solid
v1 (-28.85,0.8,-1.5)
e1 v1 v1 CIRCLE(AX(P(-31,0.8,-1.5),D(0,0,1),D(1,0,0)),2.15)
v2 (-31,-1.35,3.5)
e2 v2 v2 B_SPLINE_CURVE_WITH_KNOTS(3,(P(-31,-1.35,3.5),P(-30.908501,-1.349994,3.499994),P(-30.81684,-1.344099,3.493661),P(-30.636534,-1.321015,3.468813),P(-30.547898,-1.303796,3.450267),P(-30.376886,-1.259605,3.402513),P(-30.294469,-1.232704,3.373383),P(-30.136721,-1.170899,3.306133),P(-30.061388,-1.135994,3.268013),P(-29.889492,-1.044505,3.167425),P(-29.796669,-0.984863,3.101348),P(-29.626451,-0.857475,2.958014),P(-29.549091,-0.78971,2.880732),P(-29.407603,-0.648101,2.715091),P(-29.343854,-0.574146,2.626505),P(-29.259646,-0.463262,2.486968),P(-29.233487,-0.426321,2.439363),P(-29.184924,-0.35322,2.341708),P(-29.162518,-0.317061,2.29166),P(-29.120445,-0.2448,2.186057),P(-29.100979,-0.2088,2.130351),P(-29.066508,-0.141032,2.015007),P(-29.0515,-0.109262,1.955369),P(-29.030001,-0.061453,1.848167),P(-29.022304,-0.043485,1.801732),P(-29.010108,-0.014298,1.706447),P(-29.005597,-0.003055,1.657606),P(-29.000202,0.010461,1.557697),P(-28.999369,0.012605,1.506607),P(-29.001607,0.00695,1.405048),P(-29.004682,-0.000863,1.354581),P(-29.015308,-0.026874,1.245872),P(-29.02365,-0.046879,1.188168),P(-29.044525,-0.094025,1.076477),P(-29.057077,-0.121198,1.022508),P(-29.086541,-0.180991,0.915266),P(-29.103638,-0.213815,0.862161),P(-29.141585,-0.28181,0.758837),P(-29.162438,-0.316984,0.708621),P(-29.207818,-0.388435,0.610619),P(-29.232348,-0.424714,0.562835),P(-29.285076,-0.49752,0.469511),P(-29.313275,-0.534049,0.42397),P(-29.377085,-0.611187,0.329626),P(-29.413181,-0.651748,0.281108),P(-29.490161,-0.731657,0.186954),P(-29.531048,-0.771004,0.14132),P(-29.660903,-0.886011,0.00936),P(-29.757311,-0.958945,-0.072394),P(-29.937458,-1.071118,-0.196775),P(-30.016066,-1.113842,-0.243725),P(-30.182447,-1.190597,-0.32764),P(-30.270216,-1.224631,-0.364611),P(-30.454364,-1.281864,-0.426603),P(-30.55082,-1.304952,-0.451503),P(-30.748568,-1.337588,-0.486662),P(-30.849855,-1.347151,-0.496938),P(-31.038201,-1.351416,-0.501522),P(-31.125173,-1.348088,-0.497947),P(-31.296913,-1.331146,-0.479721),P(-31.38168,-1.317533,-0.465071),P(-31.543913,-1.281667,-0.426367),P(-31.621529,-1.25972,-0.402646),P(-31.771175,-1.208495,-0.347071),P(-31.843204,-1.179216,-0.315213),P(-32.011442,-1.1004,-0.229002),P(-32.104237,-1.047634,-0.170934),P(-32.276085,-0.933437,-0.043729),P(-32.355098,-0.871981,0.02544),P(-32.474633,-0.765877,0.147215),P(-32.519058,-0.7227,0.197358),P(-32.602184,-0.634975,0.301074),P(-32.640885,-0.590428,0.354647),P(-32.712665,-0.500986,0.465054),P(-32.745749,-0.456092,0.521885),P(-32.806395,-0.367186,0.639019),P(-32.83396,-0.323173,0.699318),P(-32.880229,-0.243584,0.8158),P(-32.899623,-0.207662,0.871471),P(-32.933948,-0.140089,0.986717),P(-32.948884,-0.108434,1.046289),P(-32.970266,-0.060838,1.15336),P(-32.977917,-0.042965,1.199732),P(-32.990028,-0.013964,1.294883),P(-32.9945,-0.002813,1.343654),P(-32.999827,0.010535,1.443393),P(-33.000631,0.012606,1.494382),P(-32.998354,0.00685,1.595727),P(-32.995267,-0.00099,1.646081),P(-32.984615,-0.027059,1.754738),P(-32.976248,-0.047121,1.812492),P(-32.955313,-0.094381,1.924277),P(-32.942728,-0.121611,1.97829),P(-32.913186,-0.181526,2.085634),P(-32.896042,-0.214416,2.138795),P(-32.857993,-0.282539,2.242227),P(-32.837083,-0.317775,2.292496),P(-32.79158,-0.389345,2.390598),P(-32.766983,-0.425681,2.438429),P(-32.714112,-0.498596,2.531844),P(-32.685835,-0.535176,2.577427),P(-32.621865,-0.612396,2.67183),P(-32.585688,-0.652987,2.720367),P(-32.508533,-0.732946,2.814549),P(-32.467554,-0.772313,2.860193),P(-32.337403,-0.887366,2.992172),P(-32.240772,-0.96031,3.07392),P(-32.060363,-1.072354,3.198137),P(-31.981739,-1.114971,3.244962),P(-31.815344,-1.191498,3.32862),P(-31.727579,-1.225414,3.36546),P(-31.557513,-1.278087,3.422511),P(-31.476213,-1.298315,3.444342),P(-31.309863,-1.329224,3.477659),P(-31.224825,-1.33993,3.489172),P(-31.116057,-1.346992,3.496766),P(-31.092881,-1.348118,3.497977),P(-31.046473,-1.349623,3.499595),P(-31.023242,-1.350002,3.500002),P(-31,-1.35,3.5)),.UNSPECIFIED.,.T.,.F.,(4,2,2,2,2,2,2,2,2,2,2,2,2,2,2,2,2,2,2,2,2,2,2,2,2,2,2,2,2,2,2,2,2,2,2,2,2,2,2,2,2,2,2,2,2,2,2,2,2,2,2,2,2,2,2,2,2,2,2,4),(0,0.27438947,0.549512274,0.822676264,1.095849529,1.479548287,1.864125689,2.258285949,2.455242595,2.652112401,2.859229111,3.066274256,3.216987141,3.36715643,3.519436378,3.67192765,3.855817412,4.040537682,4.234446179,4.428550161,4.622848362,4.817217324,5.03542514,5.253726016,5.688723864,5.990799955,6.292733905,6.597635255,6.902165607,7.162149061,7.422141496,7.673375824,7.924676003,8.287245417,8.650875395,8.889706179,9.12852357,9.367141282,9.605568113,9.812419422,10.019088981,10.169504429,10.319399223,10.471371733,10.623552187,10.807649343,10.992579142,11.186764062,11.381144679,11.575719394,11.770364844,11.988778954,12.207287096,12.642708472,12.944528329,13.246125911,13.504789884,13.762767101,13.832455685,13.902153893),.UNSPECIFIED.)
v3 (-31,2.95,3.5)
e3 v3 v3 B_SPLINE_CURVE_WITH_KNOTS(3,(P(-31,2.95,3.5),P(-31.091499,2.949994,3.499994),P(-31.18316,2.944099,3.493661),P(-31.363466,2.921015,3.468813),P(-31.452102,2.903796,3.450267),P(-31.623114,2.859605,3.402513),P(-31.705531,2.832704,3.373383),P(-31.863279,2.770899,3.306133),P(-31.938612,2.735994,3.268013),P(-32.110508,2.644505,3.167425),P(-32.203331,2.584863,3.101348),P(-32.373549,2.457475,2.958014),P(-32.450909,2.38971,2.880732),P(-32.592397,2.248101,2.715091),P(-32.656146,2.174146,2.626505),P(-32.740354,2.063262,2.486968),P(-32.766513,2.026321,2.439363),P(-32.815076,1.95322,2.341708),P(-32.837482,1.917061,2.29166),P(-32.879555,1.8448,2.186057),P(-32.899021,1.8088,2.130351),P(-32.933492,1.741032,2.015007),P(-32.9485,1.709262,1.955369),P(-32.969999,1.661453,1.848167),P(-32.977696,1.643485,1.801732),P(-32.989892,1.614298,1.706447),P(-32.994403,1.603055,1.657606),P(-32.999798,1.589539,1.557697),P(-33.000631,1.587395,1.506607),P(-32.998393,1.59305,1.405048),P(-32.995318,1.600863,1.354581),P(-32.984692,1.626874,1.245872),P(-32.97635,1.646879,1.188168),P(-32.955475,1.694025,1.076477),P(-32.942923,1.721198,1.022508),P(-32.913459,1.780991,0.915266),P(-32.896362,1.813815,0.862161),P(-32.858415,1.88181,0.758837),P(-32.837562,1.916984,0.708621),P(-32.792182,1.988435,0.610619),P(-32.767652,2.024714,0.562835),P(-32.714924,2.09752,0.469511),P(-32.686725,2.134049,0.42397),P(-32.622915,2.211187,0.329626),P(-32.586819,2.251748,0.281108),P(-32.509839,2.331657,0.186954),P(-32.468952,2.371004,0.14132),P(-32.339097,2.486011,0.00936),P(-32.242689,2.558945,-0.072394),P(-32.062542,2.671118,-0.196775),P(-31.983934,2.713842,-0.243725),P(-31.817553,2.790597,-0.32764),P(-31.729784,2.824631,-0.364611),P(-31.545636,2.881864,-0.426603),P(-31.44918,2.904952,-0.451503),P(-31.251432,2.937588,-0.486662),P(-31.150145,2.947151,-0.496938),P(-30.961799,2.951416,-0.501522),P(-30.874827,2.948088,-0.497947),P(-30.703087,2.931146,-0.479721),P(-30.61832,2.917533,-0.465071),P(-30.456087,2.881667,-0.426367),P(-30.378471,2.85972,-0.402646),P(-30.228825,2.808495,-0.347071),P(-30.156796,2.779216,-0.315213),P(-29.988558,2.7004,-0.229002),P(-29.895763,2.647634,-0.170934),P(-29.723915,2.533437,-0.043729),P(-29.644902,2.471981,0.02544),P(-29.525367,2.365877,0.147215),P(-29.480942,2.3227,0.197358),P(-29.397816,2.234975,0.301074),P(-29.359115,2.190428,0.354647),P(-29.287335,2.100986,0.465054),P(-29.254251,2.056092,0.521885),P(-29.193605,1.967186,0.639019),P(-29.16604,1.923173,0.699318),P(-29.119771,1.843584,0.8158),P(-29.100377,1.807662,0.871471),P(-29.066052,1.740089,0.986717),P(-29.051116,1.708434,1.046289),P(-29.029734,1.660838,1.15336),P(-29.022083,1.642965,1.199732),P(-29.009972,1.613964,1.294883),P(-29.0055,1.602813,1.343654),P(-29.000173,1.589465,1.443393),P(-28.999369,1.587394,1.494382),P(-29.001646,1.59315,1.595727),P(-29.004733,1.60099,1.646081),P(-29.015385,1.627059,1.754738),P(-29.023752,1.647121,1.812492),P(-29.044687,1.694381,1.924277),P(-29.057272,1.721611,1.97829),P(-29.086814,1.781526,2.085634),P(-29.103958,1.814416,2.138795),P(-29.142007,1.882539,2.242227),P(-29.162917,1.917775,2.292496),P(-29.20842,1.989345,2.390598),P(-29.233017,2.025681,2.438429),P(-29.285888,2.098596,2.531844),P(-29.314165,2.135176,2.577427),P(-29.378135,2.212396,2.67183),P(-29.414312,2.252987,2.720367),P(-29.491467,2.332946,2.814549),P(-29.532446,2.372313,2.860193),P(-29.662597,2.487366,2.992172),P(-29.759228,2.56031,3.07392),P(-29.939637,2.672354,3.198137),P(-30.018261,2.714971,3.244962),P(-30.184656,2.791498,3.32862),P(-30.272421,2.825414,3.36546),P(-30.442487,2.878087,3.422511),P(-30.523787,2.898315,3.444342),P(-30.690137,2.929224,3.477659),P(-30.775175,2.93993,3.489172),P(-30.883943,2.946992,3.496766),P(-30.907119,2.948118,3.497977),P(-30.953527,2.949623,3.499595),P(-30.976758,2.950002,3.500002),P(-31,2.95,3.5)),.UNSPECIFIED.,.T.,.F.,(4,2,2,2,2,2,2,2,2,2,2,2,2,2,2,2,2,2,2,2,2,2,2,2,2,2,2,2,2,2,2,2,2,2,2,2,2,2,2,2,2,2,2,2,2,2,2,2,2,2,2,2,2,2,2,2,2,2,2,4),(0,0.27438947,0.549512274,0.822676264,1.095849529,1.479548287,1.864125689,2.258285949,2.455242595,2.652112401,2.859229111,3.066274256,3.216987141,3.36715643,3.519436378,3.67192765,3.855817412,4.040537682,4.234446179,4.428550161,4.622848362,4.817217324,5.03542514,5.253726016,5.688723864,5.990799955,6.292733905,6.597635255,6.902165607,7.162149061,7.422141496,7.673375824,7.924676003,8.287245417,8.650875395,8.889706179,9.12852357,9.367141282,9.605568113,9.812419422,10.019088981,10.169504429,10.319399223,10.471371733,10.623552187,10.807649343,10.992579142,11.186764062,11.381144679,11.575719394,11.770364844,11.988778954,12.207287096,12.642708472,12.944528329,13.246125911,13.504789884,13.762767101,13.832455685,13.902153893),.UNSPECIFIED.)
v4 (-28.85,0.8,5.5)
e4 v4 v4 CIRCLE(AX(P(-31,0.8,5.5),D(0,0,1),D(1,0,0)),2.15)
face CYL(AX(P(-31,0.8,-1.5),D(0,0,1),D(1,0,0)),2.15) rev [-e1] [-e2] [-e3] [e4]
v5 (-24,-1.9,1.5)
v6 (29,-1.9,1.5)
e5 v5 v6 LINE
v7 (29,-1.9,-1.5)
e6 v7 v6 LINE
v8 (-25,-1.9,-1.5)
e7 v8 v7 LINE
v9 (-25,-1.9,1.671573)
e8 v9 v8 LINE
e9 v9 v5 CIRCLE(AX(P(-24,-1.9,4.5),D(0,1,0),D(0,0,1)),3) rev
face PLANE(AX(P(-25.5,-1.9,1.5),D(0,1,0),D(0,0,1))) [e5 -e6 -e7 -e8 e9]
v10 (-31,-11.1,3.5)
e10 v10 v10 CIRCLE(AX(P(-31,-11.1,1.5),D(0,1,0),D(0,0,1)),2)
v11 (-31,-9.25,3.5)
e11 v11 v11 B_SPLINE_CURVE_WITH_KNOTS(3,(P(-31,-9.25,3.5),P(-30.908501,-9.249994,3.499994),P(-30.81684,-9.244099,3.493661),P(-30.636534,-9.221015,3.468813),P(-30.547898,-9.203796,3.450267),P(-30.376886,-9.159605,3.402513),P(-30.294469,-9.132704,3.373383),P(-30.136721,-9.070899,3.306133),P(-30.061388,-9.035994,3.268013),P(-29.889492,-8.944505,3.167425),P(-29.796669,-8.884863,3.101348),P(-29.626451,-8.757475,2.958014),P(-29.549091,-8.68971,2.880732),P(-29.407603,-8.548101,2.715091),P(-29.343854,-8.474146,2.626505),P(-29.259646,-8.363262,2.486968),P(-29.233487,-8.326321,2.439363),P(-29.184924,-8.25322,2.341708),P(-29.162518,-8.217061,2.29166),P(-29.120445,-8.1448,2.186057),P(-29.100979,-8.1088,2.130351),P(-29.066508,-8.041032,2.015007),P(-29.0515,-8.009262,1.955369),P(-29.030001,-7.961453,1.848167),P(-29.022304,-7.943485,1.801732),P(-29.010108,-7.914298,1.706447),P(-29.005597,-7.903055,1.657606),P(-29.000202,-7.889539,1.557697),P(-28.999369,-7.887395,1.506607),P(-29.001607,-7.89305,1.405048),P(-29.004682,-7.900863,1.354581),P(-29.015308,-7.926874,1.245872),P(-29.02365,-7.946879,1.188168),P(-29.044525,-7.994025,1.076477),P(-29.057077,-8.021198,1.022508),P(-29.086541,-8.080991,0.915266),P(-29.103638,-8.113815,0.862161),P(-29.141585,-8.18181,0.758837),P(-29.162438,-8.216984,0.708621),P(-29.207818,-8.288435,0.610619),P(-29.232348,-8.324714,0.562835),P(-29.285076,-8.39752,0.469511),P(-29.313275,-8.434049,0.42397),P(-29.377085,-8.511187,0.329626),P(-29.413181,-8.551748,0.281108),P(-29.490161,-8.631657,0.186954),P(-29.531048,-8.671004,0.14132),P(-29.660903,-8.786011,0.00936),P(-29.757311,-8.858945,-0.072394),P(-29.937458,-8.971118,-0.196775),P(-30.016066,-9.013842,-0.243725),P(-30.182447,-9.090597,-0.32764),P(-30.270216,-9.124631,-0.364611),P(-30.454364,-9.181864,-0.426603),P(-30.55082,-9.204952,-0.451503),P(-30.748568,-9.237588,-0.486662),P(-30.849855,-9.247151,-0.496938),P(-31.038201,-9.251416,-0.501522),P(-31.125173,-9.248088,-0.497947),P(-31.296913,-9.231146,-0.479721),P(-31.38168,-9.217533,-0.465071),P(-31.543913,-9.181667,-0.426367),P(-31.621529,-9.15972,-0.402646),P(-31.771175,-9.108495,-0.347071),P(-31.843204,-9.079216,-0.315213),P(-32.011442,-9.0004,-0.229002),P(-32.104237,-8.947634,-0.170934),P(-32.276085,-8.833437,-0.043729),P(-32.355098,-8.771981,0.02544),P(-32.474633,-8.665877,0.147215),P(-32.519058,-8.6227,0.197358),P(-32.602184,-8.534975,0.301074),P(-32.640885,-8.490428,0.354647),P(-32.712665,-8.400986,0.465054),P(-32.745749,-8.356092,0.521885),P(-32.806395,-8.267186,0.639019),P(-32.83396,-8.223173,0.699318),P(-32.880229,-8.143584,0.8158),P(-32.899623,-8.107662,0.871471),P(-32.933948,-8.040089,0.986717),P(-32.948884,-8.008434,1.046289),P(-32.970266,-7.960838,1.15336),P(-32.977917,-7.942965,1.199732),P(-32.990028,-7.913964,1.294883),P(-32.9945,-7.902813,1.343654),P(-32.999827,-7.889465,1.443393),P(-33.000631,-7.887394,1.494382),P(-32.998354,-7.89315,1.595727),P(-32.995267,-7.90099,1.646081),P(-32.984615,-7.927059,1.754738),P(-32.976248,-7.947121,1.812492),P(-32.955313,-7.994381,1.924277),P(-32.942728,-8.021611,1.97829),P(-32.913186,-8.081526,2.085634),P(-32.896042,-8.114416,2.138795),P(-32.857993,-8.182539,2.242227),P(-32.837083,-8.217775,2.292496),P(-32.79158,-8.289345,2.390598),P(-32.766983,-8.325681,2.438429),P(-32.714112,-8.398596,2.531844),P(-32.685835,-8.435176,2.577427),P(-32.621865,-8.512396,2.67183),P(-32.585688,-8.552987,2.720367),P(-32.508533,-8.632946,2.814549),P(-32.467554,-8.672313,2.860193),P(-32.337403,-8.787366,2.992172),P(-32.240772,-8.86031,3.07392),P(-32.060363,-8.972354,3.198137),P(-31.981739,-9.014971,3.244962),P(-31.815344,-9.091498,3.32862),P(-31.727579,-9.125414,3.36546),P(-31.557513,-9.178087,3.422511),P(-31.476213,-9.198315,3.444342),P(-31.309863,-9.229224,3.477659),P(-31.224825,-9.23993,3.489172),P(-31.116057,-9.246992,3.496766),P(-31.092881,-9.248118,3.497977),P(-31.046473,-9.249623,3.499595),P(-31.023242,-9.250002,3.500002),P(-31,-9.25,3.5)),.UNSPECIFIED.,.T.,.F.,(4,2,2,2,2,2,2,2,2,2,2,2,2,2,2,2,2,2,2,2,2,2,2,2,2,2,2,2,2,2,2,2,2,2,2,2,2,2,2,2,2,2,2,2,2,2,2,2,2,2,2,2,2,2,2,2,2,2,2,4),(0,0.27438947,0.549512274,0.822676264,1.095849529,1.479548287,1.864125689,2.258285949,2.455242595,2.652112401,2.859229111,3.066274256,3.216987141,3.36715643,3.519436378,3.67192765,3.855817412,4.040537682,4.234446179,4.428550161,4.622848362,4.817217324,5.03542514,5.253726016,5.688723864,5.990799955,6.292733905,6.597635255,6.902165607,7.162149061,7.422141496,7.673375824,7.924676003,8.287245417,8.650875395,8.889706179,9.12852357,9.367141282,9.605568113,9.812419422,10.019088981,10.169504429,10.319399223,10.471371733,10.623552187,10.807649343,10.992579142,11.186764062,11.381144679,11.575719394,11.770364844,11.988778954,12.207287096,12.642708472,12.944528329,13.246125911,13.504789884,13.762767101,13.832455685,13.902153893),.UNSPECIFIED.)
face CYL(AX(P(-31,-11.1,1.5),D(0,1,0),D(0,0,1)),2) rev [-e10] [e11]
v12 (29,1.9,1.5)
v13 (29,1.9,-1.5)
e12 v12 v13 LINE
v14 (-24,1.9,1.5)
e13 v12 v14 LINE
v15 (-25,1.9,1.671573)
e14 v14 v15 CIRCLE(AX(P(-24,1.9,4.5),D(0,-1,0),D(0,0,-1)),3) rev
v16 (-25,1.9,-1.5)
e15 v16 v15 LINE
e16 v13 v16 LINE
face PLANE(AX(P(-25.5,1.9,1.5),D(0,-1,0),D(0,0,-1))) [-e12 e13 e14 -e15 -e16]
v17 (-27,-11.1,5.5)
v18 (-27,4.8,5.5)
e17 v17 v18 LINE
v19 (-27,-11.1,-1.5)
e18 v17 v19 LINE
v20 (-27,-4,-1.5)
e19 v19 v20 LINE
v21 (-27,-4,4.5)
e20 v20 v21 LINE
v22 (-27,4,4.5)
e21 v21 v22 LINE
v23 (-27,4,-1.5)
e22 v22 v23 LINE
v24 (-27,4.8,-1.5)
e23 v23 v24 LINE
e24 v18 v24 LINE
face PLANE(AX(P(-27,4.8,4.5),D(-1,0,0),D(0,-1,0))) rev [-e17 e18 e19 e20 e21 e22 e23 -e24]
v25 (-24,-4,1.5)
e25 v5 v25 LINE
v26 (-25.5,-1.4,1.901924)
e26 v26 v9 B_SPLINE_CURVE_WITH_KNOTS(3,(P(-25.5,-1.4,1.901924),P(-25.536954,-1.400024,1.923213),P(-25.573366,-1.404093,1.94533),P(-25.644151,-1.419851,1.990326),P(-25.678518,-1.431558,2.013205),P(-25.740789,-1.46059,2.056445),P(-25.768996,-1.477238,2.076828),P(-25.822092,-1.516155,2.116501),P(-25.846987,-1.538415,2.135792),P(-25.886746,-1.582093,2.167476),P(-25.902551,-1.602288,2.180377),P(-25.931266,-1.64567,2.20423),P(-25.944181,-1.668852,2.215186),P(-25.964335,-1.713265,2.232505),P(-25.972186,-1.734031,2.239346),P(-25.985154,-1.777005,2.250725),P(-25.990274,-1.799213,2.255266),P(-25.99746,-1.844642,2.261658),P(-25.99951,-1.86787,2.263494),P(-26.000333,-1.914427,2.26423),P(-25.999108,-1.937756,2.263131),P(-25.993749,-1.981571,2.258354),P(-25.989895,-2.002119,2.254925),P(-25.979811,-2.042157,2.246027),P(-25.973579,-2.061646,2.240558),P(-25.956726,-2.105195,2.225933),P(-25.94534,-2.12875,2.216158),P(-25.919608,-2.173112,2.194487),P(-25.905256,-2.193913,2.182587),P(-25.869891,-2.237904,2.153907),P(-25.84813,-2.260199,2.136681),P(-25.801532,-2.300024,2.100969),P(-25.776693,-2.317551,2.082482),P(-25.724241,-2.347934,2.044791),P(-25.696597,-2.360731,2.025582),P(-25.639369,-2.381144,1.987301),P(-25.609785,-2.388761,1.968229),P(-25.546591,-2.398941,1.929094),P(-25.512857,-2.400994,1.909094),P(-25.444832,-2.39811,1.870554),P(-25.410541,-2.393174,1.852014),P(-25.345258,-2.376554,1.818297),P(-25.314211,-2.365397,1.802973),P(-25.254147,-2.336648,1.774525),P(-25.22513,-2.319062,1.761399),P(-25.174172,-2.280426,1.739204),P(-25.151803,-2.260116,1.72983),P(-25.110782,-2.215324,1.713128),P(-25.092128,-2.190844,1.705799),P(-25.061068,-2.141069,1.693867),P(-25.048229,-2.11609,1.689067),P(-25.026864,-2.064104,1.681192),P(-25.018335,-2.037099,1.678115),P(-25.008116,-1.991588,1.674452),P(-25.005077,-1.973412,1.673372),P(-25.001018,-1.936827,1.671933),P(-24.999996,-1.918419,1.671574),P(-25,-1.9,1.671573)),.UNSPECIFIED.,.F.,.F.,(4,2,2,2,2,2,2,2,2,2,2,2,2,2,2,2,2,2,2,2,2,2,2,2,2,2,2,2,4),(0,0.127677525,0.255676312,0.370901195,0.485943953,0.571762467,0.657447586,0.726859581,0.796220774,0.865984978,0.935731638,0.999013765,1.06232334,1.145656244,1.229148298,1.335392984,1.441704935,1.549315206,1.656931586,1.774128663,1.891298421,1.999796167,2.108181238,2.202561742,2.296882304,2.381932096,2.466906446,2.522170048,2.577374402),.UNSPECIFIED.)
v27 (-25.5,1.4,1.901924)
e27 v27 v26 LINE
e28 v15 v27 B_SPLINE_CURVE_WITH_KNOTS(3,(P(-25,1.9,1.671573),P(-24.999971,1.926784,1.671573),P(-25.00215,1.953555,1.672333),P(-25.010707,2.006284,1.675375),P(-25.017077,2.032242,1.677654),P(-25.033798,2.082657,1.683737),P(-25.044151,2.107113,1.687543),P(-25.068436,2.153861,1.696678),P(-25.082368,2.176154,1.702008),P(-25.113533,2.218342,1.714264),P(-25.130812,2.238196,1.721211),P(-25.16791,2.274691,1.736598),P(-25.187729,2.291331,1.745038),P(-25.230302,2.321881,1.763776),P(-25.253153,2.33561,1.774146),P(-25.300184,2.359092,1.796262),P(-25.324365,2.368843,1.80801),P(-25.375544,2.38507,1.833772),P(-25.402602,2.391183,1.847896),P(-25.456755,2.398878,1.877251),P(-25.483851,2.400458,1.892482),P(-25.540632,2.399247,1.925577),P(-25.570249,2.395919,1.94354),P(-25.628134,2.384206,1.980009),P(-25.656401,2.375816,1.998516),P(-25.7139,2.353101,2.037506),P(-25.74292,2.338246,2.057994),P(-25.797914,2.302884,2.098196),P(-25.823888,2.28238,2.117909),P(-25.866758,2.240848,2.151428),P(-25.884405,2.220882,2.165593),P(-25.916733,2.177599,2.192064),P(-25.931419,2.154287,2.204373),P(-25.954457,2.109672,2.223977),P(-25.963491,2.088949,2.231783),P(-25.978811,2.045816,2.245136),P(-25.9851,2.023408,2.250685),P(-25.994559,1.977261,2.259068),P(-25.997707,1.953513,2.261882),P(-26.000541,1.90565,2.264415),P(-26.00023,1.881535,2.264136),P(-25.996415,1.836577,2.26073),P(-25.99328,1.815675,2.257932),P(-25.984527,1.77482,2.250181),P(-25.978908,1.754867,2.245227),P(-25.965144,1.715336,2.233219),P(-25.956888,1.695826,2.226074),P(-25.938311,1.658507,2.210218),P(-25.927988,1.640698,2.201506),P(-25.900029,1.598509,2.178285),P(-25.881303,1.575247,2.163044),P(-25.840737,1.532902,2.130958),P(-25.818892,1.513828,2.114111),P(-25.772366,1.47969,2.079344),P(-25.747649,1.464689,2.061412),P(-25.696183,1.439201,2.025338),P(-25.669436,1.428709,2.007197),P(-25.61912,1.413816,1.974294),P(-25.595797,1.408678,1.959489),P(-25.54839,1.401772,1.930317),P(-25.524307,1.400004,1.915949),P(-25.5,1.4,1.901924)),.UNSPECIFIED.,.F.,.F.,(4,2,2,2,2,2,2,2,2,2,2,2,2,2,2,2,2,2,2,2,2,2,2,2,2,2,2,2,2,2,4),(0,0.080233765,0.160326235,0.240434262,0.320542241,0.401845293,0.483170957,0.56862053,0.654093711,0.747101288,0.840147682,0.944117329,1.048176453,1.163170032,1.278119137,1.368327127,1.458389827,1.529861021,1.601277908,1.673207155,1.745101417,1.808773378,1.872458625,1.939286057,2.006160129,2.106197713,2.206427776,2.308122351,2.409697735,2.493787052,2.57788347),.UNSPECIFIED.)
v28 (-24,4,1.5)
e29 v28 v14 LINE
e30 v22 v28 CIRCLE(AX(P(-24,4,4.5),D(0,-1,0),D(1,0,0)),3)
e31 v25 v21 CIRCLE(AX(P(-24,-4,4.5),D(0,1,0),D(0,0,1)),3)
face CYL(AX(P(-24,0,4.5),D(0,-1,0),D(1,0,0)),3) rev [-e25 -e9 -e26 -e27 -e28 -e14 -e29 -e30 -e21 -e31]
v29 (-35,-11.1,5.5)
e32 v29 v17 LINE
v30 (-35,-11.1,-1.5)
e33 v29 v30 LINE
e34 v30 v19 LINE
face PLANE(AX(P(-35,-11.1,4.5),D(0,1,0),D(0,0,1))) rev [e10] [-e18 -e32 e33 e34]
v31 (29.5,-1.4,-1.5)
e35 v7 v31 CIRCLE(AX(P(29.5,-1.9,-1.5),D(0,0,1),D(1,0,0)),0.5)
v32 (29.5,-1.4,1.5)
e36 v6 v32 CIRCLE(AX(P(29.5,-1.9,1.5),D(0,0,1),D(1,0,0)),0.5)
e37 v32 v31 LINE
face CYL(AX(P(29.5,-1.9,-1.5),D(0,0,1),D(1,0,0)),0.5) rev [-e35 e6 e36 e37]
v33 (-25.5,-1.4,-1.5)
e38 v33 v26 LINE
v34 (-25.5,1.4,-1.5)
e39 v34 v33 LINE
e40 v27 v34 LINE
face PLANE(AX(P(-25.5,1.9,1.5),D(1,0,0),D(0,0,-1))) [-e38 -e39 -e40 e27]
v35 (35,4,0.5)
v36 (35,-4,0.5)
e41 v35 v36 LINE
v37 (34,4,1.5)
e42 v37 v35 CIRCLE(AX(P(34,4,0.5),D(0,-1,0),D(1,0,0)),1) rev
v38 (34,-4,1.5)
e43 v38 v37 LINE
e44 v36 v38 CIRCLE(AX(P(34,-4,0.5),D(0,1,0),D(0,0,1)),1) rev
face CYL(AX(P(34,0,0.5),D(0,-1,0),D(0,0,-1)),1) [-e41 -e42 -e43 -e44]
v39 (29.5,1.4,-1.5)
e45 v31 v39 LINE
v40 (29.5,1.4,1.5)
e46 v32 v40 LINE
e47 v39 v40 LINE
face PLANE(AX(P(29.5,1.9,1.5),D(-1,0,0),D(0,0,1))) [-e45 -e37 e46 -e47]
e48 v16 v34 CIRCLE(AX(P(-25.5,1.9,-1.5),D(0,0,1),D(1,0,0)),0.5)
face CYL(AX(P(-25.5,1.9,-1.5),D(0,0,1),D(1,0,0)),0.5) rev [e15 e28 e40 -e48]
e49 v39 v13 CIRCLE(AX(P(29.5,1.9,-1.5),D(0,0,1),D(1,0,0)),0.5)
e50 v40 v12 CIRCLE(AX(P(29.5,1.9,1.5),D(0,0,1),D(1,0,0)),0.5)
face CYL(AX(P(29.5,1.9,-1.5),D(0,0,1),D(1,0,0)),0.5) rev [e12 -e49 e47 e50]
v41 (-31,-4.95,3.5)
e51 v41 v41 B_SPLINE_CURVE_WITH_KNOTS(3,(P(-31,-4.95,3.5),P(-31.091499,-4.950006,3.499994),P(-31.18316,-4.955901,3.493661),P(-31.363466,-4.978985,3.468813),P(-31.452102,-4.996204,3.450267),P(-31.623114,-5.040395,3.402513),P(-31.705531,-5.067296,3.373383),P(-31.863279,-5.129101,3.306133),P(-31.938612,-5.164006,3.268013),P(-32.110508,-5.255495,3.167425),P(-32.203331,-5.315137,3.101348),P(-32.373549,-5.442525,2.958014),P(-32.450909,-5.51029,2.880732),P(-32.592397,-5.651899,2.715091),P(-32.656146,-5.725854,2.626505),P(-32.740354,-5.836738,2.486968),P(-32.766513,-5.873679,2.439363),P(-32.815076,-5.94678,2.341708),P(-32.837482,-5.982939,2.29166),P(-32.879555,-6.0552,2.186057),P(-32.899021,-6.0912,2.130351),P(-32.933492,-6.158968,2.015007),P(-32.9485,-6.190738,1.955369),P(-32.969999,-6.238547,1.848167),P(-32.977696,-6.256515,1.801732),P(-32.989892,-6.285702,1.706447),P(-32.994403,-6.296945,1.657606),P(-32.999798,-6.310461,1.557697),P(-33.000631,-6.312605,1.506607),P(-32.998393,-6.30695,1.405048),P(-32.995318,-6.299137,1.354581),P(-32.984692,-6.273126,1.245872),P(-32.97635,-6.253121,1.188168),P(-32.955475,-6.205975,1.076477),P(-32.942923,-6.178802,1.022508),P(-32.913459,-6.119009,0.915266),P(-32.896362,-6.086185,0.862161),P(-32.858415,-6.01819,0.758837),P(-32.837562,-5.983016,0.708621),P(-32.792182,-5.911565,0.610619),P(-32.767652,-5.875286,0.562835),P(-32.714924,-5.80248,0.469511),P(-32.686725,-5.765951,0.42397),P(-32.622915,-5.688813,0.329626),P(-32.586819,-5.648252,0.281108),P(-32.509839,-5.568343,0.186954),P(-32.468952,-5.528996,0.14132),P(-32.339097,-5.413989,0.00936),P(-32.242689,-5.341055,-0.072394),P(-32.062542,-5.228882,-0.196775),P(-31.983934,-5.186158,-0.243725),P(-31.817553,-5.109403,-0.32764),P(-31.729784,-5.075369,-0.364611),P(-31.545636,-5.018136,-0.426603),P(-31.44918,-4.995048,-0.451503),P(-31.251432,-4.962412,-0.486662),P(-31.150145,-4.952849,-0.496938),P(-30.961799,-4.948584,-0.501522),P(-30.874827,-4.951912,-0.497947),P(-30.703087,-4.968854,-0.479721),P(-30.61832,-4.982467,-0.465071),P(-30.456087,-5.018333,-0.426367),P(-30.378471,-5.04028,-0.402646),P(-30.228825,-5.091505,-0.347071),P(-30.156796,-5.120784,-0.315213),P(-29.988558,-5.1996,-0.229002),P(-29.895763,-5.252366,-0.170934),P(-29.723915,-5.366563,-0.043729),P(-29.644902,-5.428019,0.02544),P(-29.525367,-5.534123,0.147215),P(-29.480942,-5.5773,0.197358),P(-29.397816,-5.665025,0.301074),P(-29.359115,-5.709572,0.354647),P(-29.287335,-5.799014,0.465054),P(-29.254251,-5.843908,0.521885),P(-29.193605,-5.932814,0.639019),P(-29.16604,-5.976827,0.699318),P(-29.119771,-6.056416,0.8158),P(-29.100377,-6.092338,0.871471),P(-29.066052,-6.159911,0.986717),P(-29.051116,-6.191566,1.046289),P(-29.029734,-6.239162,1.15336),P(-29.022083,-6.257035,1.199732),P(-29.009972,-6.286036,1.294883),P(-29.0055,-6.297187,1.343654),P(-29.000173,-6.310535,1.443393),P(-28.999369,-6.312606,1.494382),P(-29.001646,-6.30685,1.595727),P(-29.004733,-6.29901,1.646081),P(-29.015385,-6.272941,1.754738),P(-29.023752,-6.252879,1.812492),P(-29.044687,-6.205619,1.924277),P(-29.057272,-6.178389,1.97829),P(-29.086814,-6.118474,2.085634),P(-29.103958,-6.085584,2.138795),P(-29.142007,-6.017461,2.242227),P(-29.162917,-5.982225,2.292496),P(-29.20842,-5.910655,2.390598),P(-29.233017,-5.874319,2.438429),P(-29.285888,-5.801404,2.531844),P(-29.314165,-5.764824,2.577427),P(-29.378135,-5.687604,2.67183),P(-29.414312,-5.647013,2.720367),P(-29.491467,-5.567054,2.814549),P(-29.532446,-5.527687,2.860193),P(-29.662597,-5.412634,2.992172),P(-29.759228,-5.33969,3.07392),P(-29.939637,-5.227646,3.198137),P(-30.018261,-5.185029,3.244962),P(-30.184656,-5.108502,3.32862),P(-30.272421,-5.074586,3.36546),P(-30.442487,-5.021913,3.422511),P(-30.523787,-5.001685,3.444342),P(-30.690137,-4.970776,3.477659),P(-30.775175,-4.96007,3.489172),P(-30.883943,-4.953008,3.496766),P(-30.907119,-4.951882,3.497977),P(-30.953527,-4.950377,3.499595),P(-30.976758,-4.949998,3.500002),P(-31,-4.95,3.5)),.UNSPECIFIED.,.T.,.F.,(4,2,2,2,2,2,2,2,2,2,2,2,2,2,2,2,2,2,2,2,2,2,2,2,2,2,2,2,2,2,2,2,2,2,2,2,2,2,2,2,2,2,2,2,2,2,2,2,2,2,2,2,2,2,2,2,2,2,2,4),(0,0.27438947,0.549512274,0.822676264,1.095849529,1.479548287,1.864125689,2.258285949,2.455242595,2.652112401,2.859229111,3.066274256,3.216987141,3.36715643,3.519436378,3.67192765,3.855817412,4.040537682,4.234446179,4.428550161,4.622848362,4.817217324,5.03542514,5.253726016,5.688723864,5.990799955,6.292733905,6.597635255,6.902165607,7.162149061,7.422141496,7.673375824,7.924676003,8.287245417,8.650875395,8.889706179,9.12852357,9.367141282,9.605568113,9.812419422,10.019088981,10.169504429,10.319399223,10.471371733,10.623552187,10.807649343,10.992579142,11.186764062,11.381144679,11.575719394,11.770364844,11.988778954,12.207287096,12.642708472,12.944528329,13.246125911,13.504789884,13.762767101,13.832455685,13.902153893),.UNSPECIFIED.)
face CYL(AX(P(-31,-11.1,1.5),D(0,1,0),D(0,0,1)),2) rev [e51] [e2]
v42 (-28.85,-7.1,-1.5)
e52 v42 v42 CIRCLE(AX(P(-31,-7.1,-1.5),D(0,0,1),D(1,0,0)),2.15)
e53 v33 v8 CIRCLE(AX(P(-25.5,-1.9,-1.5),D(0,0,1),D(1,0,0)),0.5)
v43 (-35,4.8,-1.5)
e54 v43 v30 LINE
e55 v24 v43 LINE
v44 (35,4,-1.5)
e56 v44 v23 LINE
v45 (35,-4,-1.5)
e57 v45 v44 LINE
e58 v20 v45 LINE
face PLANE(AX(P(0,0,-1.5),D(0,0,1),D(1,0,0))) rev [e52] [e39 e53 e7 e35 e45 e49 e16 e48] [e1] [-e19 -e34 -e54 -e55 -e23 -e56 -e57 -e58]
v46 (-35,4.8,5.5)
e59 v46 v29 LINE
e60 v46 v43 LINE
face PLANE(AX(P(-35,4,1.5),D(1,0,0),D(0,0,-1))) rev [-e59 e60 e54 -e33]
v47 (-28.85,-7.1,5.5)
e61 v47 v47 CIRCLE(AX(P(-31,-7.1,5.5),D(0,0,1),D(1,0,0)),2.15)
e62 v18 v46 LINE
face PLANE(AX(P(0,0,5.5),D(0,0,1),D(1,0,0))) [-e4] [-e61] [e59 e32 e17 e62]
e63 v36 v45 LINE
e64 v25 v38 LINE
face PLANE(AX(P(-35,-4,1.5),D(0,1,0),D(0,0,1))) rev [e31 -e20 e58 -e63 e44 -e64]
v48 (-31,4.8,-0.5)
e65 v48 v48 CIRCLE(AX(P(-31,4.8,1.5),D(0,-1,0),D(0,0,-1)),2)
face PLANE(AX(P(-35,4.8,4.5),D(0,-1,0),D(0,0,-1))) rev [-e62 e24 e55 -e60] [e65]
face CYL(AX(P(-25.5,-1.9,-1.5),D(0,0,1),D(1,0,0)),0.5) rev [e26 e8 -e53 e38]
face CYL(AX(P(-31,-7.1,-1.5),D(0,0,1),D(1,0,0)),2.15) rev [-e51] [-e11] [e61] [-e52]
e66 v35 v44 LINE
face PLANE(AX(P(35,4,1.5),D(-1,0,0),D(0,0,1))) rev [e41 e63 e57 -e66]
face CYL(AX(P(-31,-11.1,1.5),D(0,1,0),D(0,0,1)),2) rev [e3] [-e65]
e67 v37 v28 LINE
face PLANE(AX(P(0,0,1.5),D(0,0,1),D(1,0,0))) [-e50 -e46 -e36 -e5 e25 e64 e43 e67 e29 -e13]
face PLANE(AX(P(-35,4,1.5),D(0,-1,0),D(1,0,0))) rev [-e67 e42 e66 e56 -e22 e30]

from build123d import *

# Parameters (mm, degrees)
SKIZZE1_W                    = 70
SKIZZE1_H                    = 8
SKIZZE1_W_2                  = 55
SKIZZE1_H_2                  = 3.8
BODY_DEPTH                   = 1.5
LOCHUNGSSKIZZE_R             = 0.5
RAHMENLOCHUNGEN_DEPTH        = 36.355339059
VERRUNDUNG1_R                = 1
SCHNABEL_DEPTH               = 3
SCHNABELAUFSATZSKIZZE_W      = 8
SCHNABELAUFSATZSKIZZE_H      = 15.9
SCHNABELAUFSATZ_DEPTH        = 1
LOCHUNGHORIZONTAL_DEPTH      = 39.83374821
LOCHUNGHORIZONTAL_DEPTH_BACK = 39.83374821
SKIZZE4_R                    = 2
SKIZZE5_R                    = 2.15
LOCHUNG2_DEPTH               = 38.379272331
VERRUNDUNG4_R                = 3


with BuildPart() as part:
    # Skizze1 → Body (new, symmetric)
    with BuildSketch(Plane.XY):
        Rectangle(SKIZZE1_W, SKIZZE1_H)
        with Locations((2, 0)):
            Rectangle(SKIZZE1_W_2, SKIZZE1_H_2, mode=Mode.SUBTRACT)
    extrude(amount=BODY_DEPTH, both=True)

    # Lochungsskizze → RahmenLochungen (cut, through all)
    with BuildSketch(Plane.XY.offset(1.5)):
        with Locations((-25.5, 1.9)):
            Circle(LOCHUNGSSKIZZE_R)
        with Locations((-25.5, -1.9)):
            Circle(LOCHUNGSSKIZZE_R)
        with Locations((29.5, -1.9)):
            Circle(LOCHUNGSSKIZZE_R)
        with Locations((29.5, 1.9)):
            Circle(LOCHUNGSSKIZZE_R)
    extrude(amount=-RAHMENLOCHUNGEN_DEPTH, mode=Mode.SUBTRACT)

    # Verrundung1
    verrundung1_edges = [part.edges().sort_by_distance(p)[0] for p in [
        (35, 0, 1.5),
    ]]
    fillet(verrundung1_edges, radius=VERRUNDUNG1_R)

    # Skizze2 → Schnabel (add, symmetric)
    with BuildSketch(Plane.XY.offset(1.5)):
        Polygon((-35, 0), (-35, -11.1), (-27, -11.1), (-27, 0), (-27, 4.8), (-35, 4.8), align=None)
    extrude(amount=SCHNABEL_DEPTH, both=True)

    # Schnabelaufsatzskizze → Schnabelaufsatz (add)
    with BuildSketch(Plane.XY.offset(4.5)):
        with Locations((-31, -3.15)):
            Rectangle(SCHNABELAUFSATZSKIZZE_W, SCHNABELAUFSATZSKIZZE_H)
    extrude(amount=SCHNABELAUFSATZ_DEPTH)

    # Skizze4 → lochungHorizontal (cut, two sides: drawn at the far end of the back side and taken through both)
    with BuildSketch(Plane(origin=(0, 4.8, 0), x_dir=(1, 0, 0), z_dir=(0, 1, 0)).offset(-LOCHUNGHORIZONTAL_DEPTH_BACK)):
        with Locations(Location((-31, -1.5, 0), (0, 0, 270))):
            Circle(SKIZZE4_R)
    extrude(amount=LOCHUNGHORIZONTAL_DEPTH + LOCHUNGHORIZONTAL_DEPTH_BACK, mode=Mode.SUBTRACT)

    # Skizze5 → lochung2 (cut, through all)
    with BuildSketch(Plane.XY.offset(5.5)):
        with Locations((-31, 0.8)):
            Circle(SKIZZE5_R)
        with Locations((-31, -7.1)):
            Circle(SKIZZE5_R)
    extrude(amount=-LOCHUNG2_DEPTH, mode=Mode.SUBTRACT)

    # Verrundung4
    # the kernel refuses this fillet: 3 mm, written as the material it adds along each edge
    with BuildSketch(Plane(origin=(-27, 4, 1.5), x_dir=(0, 0, 1), z_dir=(0, -1, 0))) as verrundung4_piece_1_section:
        with BuildLine():
            CenterArc((VERRUNDUNG4_R, -VERRUNDUNG4_R), VERRUNDUNG4_R, 90, 90)
            Line((0, -VERRUNDUNG4_R), (0, 0))
            Line((0, 0), (VERRUNDUNG4_R, 0))
        make_face()
    verrundung4_piece_1 = extrude(amount=8, mode=Mode.PRIVATE)
    verrundung4_piece_1 = split(verrundung4_piece_1, bisect_by=Plane(origin=(-25.5, 2.974318448, 2.280258201), z_dir=(-1, 0, 0)), keep=Keep.TOP, mode=Mode.PRIVATE)
    verrundung4_piece_1 = verrundung4_piece_1 - Plane(origin=(-25.5, 1.9, 2.280258201), x_dir=(1, 0, 0), z_dir=(0, 0, 1)) * Cylinder(0.5, 28, mode=Mode.PRIVATE)
    verrundung4_piece_1 = split(verrundung4_piece_1, bisect_by=Plane(origin=(-26.529126239, 1.9, 2.280258201), z_dir=(0, 1, 0)), keep=Keep.TOP, mode=Mode.PRIVATE)
    with BuildSketch(Plane(origin=(-27, 4, 1.5), x_dir=(0, 0, 1), z_dir=(0, -1, 0))) as verrundung4_piece_2_section:
        with BuildLine():
            CenterArc((VERRUNDUNG4_R, -VERRUNDUNG4_R), VERRUNDUNG4_R, 90, 90)
            Line((0, -VERRUNDUNG4_R), (0, 0))
            Line((0, 0), (VERRUNDUNG4_R, 0))
        make_face()
    verrundung4_piece_2 = extrude(amount=8, mode=Mode.PRIVATE)
    verrundung4_piece_2 = split(verrundung4_piece_2, bisect_by=Plane(origin=(-25.5, 3.059225234, 1.565370455), z_dir=(1, 0, 0)), keep=Keep.TOP, mode=Mode.PRIVATE)
    verrundung4_piece_2 = verrundung4_piece_2 - Plane(origin=(-25.5, 1.9, 1.565370455), x_dir=(1, 0, 0), z_dir=(0, 0, 1)) * Cylinder(0.5, 28, mode=Mode.PRIVATE)
    verrundung4_piece_2 = split(verrundung4_piece_2, bisect_by=Plane(origin=(-24.970725973, 1.9, 1.565370455), z_dir=(0, 1, 0)), keep=Keep.TOP, mode=Mode.PRIVATE)
    with BuildSketch(Plane(origin=(-27, 4, 1.5), x_dir=(0, 0, 1), z_dir=(0, -1, 0))) as verrundung4_piece_3_section:
        with BuildLine():
            CenterArc((VERRUNDUNG4_R, -VERRUNDUNG4_R), VERRUNDUNG4_R, 90, 90)
            Line((0, -VERRUNDUNG4_R), (0, 0))
            Line((0, 0), (VERRUNDUNG4_R, 0))
        make_face()
    verrundung4_piece_3 = extrude(amount=8, mode=Mode.PRIVATE)
    verrundung4_piece_3 = split(verrundung4_piece_3, bisect_by=Plane(origin=(-25.5, -6.8e-08, 2.281876588), z_dir=(-1, 0, 0)), keep=Keep.TOP, mode=Mode.PRIVATE)
    verrundung4_piece_3 = verrundung4_piece_3 - Plane(origin=(-25.5, -1.9, 2.281876588), x_dir=(1, 0, 0), z_dir=(0, 0, 1)) * Cylinder(0.5, 28, mode=Mode.PRIVATE)
    verrundung4_piece_3 = verrundung4_piece_3 - Plane(origin=(-25.5, 1.9, 2.281876588), x_dir=(1, 0, 0), z_dir=(0, 0, 1)) * Cylinder(0.5, 28, mode=Mode.PRIVATE)
    verrundung4_piece_3 = split(verrundung4_piece_3, bisect_by=Plane(origin=(-26.531548781, -1.9, 2.281876588), z_dir=(0, 1, 0)), keep=Keep.TOP, mode=Mode.PRIVATE)
    verrundung4_piece_3 = split(verrundung4_piece_3, bisect_by=Plane(origin=(-26.531548781, 1.9, 2.281876588), z_dir=(0, -1, 0)), keep=Keep.TOP, mode=Mode.PRIVATE)
    with BuildSketch(Plane(origin=(-27, 4, 1.5), x_dir=(0, 0, 1), z_dir=(0, -1, 0))) as verrundung4_piece_4_section:
        with BuildLine():
            CenterArc((VERRUNDUNG4_R, -VERRUNDUNG4_R), VERRUNDUNG4_R, 90, 90)
            Line((0, -VERRUNDUNG4_R), (0, 0))
            Line((0, 0), (VERRUNDUNG4_R, 0))
        make_face()
    verrundung4_piece_4 = extrude(amount=8, mode=Mode.PRIVATE)
    verrundung4_piece_4 = split(verrundung4_piece_4, bisect_by=Plane(origin=(-25.5, -2.974318432, 2.280258243), z_dir=(-1, 0, 0)), keep=Keep.TOP, mode=Mode.PRIVATE)
    verrundung4_piece_4 = verrundung4_piece_4 - Plane(origin=(-25.5, -1.9, 2.280258243), x_dir=(1, 0, 0), z_dir=(0, 0, 1)) * Cylinder(0.5, 28, mode=Mode.PRIVATE)
    verrundung4_piece_4 = split(verrundung4_piece_4, bisect_by=Plane(origin=(-26.529126252, -1.9, 2.280258243), z_dir=(0, -1, 0)), keep=Keep.TOP, mode=Mode.PRIVATE)
    with BuildSketch(Plane(origin=(-27, 4, 1.5), x_dir=(0, 0, 1), z_dir=(0, -1, 0))) as verrundung4_piece_5_section:
        with BuildLine():
            CenterArc((VERRUNDUNG4_R, -VERRUNDUNG4_R), VERRUNDUNG4_R, 90, 90)
            Line((0, -VERRUNDUNG4_R), (0, 0))
            Line((0, 0), (VERRUNDUNG4_R, 0))
        make_face()
    verrundung4_piece_5 = extrude(amount=8, mode=Mode.PRIVATE)
    verrundung4_piece_5 = split(verrundung4_piece_5, bisect_by=Plane(origin=(-25.5, -3.059225303, 1.565370439), z_dir=(1, 0, 0)), keep=Keep.TOP, mode=Mode.PRIVATE)
    verrundung4_piece_5 = verrundung4_piece_5 - Plane(origin=(-25.5, -1.9, 1.565370439), x_dir=(1, 0, 0), z_dir=(0, 0, 1)) * Cylinder(0.5, 28, mode=Mode.PRIVATE)
    verrundung4_piece_5 = split(verrundung4_piece_5, bisect_by=Plane(origin=(-24.970725956, -1.9, 1.565370439), z_dir=(0, -1, 0)), keep=Keep.TOP, mode=Mode.PRIVATE)
    add([verrundung4_piece_1, verrundung4_piece_2, verrundung4_piece_3, verrundung4_piece_4, verrundung4_piece_5])


solid = part.part
